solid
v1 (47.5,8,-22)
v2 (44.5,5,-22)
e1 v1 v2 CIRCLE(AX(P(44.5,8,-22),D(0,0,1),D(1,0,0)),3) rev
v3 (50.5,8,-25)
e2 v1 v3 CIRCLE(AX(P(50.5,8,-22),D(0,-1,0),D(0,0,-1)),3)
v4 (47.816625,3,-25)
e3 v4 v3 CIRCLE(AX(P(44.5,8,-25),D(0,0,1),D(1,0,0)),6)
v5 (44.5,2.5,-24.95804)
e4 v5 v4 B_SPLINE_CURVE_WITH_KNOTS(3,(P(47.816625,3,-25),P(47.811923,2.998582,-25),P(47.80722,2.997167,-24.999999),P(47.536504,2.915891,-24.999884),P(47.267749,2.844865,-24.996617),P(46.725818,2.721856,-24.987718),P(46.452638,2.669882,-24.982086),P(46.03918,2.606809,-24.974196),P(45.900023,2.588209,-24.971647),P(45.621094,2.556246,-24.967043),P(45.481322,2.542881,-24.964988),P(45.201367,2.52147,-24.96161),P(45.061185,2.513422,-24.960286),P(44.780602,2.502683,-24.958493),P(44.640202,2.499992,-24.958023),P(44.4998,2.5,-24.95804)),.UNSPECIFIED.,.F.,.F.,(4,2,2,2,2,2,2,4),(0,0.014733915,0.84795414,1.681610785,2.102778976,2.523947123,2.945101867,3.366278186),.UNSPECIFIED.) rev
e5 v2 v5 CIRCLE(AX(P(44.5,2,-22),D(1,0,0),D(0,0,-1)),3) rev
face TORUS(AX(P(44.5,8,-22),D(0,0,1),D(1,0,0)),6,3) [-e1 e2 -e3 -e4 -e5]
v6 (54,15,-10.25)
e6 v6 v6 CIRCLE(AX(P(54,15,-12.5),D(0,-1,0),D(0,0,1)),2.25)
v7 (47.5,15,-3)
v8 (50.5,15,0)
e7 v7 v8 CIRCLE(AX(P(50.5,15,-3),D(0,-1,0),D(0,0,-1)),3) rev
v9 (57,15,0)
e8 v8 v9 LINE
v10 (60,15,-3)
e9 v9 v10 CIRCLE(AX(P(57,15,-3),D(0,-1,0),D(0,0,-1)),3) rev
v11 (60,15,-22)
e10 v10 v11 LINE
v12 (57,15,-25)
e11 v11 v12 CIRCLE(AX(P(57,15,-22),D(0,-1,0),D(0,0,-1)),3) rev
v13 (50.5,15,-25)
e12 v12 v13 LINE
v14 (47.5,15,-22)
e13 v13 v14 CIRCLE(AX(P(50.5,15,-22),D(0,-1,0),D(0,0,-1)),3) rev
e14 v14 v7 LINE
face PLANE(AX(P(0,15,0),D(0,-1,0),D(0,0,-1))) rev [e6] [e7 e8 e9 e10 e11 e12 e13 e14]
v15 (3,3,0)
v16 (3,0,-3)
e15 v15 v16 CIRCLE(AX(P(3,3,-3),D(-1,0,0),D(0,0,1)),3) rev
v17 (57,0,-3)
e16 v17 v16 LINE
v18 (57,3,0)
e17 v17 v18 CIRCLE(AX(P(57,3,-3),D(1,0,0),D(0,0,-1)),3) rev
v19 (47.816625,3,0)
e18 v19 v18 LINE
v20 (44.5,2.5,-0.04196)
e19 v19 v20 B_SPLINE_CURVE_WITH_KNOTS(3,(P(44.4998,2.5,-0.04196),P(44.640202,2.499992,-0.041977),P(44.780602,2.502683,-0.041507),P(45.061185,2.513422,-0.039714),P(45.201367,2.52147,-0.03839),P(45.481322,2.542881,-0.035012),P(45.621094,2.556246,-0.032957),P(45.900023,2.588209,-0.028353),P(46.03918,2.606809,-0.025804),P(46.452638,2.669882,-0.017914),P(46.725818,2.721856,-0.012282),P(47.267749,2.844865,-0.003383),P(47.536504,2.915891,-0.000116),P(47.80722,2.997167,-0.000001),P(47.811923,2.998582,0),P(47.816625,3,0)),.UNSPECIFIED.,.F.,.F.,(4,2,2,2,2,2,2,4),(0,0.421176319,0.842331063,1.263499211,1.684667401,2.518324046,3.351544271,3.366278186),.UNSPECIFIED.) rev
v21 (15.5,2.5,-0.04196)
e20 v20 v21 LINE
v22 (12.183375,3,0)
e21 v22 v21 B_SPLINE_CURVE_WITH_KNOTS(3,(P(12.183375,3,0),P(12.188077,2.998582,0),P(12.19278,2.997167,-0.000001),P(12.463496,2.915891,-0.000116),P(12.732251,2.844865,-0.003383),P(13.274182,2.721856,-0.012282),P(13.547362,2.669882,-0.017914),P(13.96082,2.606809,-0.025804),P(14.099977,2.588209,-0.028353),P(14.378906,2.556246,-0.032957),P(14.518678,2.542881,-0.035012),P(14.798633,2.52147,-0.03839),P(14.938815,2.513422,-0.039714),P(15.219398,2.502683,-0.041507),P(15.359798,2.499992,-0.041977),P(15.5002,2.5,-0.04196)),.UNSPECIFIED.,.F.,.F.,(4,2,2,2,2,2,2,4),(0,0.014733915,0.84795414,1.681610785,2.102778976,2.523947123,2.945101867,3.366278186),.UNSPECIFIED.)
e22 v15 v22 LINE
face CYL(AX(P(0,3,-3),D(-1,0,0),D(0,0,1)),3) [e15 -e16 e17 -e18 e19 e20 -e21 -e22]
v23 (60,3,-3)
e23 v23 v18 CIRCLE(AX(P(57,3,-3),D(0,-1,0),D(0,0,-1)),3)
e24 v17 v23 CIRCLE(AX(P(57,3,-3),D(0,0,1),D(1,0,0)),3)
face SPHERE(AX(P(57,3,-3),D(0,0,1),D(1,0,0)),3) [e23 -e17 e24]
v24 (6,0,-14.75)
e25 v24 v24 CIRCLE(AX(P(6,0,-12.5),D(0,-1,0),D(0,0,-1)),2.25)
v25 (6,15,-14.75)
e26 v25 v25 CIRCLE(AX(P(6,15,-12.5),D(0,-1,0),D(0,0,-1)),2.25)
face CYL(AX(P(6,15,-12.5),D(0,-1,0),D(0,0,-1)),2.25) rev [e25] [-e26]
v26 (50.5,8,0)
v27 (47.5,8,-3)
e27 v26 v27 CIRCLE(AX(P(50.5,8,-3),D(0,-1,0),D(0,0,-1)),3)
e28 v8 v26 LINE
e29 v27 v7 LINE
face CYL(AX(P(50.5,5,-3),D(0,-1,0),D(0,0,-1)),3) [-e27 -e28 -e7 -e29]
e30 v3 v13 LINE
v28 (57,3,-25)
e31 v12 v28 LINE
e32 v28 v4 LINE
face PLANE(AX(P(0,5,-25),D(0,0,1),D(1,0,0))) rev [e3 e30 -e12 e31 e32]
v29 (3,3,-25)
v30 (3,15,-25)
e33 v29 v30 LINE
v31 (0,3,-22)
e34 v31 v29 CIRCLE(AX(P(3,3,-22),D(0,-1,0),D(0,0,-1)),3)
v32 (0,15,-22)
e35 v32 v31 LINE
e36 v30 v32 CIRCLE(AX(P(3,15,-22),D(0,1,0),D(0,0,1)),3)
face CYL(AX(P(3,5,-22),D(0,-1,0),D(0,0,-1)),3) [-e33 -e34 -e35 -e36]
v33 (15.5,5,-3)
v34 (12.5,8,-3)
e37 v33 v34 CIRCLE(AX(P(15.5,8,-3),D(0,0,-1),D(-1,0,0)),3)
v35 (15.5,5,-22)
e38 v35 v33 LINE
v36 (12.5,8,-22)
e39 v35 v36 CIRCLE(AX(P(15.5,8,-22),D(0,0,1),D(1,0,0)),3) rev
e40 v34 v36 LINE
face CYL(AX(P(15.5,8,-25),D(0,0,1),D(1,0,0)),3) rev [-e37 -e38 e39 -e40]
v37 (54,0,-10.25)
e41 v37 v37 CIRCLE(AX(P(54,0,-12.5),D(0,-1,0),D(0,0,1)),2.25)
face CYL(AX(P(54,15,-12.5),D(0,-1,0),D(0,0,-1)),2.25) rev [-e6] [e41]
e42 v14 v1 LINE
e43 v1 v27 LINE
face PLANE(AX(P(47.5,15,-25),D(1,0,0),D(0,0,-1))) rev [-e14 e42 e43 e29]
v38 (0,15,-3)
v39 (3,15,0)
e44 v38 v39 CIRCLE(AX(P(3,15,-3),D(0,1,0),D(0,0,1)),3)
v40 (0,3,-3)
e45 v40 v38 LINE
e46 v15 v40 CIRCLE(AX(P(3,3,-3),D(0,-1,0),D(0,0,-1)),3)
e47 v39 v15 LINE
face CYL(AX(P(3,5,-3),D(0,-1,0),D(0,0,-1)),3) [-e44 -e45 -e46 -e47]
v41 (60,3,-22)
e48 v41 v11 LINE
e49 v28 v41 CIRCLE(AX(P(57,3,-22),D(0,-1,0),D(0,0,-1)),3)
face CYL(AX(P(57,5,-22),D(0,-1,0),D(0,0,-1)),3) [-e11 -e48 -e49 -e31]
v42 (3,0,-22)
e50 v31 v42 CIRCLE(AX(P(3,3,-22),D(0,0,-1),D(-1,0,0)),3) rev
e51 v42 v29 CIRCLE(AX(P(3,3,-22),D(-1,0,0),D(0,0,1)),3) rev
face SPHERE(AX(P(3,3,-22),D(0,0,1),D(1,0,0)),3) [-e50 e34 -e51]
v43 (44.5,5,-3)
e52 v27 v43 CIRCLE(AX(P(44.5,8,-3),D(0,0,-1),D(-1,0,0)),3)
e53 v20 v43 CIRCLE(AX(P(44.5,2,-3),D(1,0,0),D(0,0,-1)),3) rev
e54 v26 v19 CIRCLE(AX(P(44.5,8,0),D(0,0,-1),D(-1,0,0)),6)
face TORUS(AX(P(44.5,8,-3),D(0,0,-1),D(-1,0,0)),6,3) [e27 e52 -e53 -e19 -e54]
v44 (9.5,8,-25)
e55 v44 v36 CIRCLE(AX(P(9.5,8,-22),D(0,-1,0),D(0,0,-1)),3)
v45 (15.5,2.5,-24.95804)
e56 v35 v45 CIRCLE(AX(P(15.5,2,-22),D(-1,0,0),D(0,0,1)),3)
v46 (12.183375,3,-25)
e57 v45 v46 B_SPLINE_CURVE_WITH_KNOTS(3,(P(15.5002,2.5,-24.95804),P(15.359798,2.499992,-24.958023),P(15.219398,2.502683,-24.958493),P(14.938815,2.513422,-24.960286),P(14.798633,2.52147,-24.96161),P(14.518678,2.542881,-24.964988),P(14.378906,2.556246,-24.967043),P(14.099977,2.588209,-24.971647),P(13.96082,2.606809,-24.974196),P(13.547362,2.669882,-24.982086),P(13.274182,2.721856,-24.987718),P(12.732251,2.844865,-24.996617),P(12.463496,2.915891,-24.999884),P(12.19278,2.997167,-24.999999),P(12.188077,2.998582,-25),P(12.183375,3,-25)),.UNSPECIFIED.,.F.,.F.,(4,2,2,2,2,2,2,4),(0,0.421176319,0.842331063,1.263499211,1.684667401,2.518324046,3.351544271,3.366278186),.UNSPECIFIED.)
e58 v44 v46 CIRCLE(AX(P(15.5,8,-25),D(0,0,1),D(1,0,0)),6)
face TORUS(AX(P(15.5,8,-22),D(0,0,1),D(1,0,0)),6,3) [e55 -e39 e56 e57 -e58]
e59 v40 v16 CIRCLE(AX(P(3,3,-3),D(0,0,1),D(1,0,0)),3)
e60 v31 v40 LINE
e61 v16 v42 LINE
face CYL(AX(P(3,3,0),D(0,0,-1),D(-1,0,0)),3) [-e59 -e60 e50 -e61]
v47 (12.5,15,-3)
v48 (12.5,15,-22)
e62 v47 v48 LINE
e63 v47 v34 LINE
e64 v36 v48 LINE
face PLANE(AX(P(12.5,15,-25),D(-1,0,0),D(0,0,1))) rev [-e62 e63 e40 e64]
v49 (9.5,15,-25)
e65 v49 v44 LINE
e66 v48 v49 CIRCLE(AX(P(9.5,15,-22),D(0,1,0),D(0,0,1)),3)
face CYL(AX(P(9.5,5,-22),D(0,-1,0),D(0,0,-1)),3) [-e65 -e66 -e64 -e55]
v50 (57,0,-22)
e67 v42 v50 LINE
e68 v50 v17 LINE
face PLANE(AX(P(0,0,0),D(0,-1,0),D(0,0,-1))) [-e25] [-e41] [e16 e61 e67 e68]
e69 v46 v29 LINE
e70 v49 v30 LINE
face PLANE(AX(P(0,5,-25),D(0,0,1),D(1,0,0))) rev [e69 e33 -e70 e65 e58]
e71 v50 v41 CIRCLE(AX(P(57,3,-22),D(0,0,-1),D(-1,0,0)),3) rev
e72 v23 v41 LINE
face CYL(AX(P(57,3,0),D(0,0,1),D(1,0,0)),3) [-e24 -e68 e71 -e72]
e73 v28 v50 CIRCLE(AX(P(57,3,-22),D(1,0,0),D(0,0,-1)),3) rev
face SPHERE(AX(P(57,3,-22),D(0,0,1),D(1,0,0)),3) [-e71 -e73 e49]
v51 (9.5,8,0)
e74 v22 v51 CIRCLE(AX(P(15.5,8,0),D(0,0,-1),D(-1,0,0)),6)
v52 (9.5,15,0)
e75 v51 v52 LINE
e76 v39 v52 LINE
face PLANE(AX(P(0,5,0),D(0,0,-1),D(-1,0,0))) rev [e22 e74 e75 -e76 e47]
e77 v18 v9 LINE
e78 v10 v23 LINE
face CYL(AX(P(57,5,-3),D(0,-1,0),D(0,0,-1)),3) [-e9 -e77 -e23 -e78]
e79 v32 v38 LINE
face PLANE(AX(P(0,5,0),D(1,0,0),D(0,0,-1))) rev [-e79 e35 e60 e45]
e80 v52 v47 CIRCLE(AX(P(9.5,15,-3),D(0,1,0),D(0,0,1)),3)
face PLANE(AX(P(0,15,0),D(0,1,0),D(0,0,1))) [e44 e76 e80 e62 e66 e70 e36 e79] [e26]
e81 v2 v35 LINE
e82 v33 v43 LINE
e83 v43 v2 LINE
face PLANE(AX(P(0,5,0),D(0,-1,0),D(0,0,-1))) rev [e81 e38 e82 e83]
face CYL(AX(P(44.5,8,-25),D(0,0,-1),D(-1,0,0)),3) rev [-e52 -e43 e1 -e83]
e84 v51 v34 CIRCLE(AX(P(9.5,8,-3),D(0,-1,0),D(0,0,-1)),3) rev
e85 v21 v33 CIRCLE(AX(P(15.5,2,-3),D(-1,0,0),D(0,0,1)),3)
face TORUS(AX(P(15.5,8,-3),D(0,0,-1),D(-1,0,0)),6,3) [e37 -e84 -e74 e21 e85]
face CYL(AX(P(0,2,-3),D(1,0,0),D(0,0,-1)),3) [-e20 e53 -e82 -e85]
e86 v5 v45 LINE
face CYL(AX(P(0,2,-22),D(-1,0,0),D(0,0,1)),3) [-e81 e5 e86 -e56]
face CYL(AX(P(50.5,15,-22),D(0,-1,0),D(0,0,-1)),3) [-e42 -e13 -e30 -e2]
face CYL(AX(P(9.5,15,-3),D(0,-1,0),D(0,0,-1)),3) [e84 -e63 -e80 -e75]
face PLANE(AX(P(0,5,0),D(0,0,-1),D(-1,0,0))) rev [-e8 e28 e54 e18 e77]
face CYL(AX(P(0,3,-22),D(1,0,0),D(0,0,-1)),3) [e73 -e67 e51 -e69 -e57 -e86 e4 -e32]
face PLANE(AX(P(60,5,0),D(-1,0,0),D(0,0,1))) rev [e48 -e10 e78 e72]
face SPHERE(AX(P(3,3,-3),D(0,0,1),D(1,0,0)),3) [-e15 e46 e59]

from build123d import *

# Parameters (mm, degrees)
SKETCH1_W           = 60
SKETCH1_H           = 25
BOSS_EXTRUDE1_DEPTH = 5
SKETCH2_W           = 12.5
SKETCH2_H           = 25
BOSS_EXTRUDE2_DEPTH = 10
SKETCH3_R           = 2.25
CUT_EXTRUDE1_DEPTH  = 15
FILLET1_R           = 3


with BuildPart() as part:
    # Sketch1 → Boss-Extrude1 (new body)
    with BuildSketch(Plane(origin=(0, 0, 0), x_dir=(1, 0, 0), z_dir=(0, 1, 0))):
        with Locations((30, 12.5)):
            Rectangle(SKETCH1_W, SKETCH1_H)
    extrude(amount=BOSS_EXTRUDE1_DEPTH)

    # Sketch2 → Boss-Extrude2 (add)
    with BuildSketch(Plane(origin=(0, 5, 0), x_dir=(1, 0, 0), z_dir=(0, 1, 0))):
        with Locations((6.25, 12.5)):
            Rectangle(SKETCH2_W, SKETCH2_H)
        with Locations((53.75, 12.5)):
            Rectangle(SKETCH2_W, SKETCH2_H)
    extrude(amount=BOSS_EXTRUDE2_DEPTH)

    # Sketch3 → Cut-Extrude1 (cut)
    with BuildSketch(Plane.XZ):
        with Locations(Location((6, -12.5, 0), (0, 0, 270))):
            Circle(SKETCH3_R)
        with Locations(Location((54, -12.5, 0), (0, 0, 90))):
            Circle(SKETCH3_R)
    extrude(amount=-CUT_EXTRUDE1_DEPTH, mode=Mode.SUBTRACT)

    # Fillet1
    # the kernel refuses this fillet: 3 mm, written as the material it adds along each edge
    with BuildSketch(Plane(origin=(12.5, 5, -25), x_dir=(0, 1, 0), z_dir=(0, 0, 1)), Plane(origin=(47.5, 5, -25), x_dir=(-1, 0, 0), z_dir=(0, 0, 1))) as fillet1_piece_1:
        with BuildLine():
            CenterArc((FILLET1_R, -FILLET1_R), FILLET1_R, 90, 90)
            Line((0, -FILLET1_R), (0, 0))
            Line((0, 0), (FILLET1_R, 0))
        make_face()
    extrude(amount=25)
    # the kernel refuses this fillet: 3 mm, written as the material it takes off along each edge
    with BuildSketch(Plane(origin=(57, 3, -22), x_dir=(0, 0, -1), z_dir=(0, -1, 0))) as fillet1_2_piece_1_section:
        Polygon((0, 0), (FILLET1_R * 1.02, 0), (FILLET1_R * 1.02, FILLET1_R * 1.02), (0, FILLET1_R * 1.02), align=None)
    fillet1_2_piece_1 = extrude(amount=FILLET1_R * 1.02, mode=Mode.PRIVATE)
    fillet1_2_piece_1 = fillet1_2_piece_1 - Plane(origin=(57, 3, -22), x_dir=(-0.7071067811865475, 0, 0.7071067811865475), z_dir=(0, -1, 0)) * Sphere(FILLET1_R, mode=Mode.PRIVATE)
    add(fillet1_2_piece_1, mode=Mode.SUBTRACT)
    with BuildSketch(Plane(origin=(3, 3, -22), x_dir=(0, 0, -1), z_dir=(0, -1, 0))) as fillet1_2_piece_2_section:
        Polygon((0, 0), (FILLET1_R * 1.02, 0), (FILLET1_R * 1.02, -FILLET1_R * 1.02), (0, -FILLET1_R * 1.02), align=None)
    fillet1_2_piece_2 = extrude(amount=FILLET1_R * 1.02, mode=Mode.PRIVATE)
    fillet1_2_piece_2 = fillet1_2_piece_2 - Plane(origin=(3, 3, -22), x_dir=(0.7071067811865475, 0, 0.7071067811865475), z_dir=(0, -1, 0)) * Sphere(FILLET1_R, mode=Mode.PRIVATE)
    add(fillet1_2_piece_2, mode=Mode.SUBTRACT)
    with BuildSketch(Plane(origin=(57, 3, -3), x_dir=(0, 0, 1), z_dir=(0, -1, 0))) as fillet1_2_piece_3_section:
        Polygon((0, 0), (FILLET1_R * 1.02, 0), (FILLET1_R * 1.02, -FILLET1_R * 1.02), (0, -FILLET1_R * 1.02), align=None)
    fillet1_2_piece_3 = extrude(amount=FILLET1_R * 1.02, mode=Mode.PRIVATE)
    fillet1_2_piece_3 = fillet1_2_piece_3 - Plane(origin=(57, 3, -3), x_dir=(-0.7071067811865475, 0, -0.7071067811865475), z_dir=(0, -1, 0)) * Sphere(FILLET1_R, mode=Mode.PRIVATE)
    add(fillet1_2_piece_3, mode=Mode.SUBTRACT)
    with BuildSketch(Plane(origin=(3, 3, -3), x_dir=(0, -1, 0), z_dir=(0, 0, 1))) as fillet1_2_piece_4_section:
        Polygon((0, 0), (FILLET1_R * 1.02, 0), (FILLET1_R * 1.02, -FILLET1_R * 1.02), (0, -FILLET1_R * 1.02), align=None)
    fillet1_2_piece_4 = extrude(amount=FILLET1_R * 1.02, mode=Mode.PRIVATE)
    fillet1_2_piece_4 = fillet1_2_piece_4 - Plane(origin=(3, 3, -3), x_dir=(0.7071067811865475, 0.7071067811865475, 0), z_dir=(0, 0, 1)) * Sphere(FILLET1_R, mode=Mode.PRIVATE)
    add(fillet1_2_piece_4, mode=Mode.SUBTRACT)
    with BuildSketch(Plane(origin=(57, 0, -25), x_dir=(0, 0, 1), z_dir=(-1, 0, 0))) as fillet1_2_piece_5:
        with BuildLine():
            CenterArc((FILLET1_R, FILLET1_R), FILLET1_R, 180, 90)
            Line((0, FILLET1_R), (0, 0))
            Line((0, 0), (FILLET1_R, 0))
        make_face()
    extrude(amount=54, mode=Mode.SUBTRACT)
    with BuildSketch(Plane(origin=(60, 0, -3), x_dir=(0, 1, 0), z_dir=(0, 0, -1)), Plane(origin=(0, 0, -22), x_dir=(0, 1, 0), z_dir=(0, 0, 1))) as fillet1_2_piece_6:
        with BuildLine():
            CenterArc((FILLET1_R, -FILLET1_R), FILLET1_R, 90, 90)
            Line((0, -FILLET1_R), (0, 0))
            Line((0, 0), (FILLET1_R, 0))
        make_face()
    extrude(amount=19, mode=Mode.SUBTRACT)
    with BuildSketch(Plane(origin=(3, 0, 0), x_dir=(0, 1, 0), z_dir=(1, 0, 0))) as fillet1_2_piece_7:
        with BuildLine():
            CenterArc((FILLET1_R, -FILLET1_R), FILLET1_R, 90, 90)
            Line((0, -FILLET1_R), (0, 0))
            Line((0, 0), (FILLET1_R, 0))
        make_face()
    extrude(amount=54, mode=Mode.SUBTRACT)
    with BuildSketch(Plane(origin=(0, 22.5, -25), x_dir=(0, 0, 1), z_dir=(0, -1, 0)), Plane(origin=(60, 3, -25), x_dir=(0, 0, 1), z_dir=(0, 1, 0)), Plane(origin=(60, 3, 0), x_dir=(-1, 0, 0), z_dir=(0, 1, 0)), Plane(origin=(0, 22.5, 0), x_dir=(1, 0, 0), z_dir=(0, -1, 0))) as fillet1_2_piece_8:
        with BuildLine():
            CenterArc((FILLET1_R, -FILLET1_R), FILLET1_R, 90, 90)
            Line((0, -FILLET1_R), (0, 0))
            Line((0, 0), (FILLET1_R, 0))
        make_face()
    extrude(amount=19.5, mode=Mode.SUBTRACT)
    # the kernel refuses this fillet: 3 mm, written as the material it takes off along each edge
    with BuildSketch(Plane(origin=(15.5, 5, 0), x_dir=(0, -1, 0), z_dir=(1, 0, 0))) as fillet1_3_piece_1:
        with BuildLine():
            CenterArc((FILLET1_R, FILLET1_R), FILLET1_R, 180, 90)
            Line((0, FILLET1_R), (0, 0))
            Line((0, 0), (FILLET1_R, 0))
        make_face()
    extrude(amount=29, mode=Mode.SUBTRACT)
    with BuildSketch(Plane(origin=(12.5, 8, 0), x_dir=(-1, 0, 0), z_dir=(0, 1, 0)), Plane(origin=(12.5, 8, -25), x_dir=(0, 0, 1), z_dir=(0, 1, 0))) as fillet1_3_piece_2:
        with BuildLine():
            CenterArc((FILLET1_R, -FILLET1_R), FILLET1_R, 90, 90)
            Line((0, -FILLET1_R), (0, 0))
            Line((0, 0), (FILLET1_R, 0))
        make_face()
    extrude(amount=14.5, mode=Mode.SUBTRACT)
    with BuildSketch(Plane(origin=(44.5, 5, -25), x_dir=(0, 0, 1), z_dir=(-1, 0, 0))) as fillet1_3_piece_3:
        with BuildLine():
            CenterArc((FILLET1_R, -FILLET1_R), FILLET1_R, 90, 90)
            Line((0, -FILLET1_R), (0, 0))
            Line((0, 0), (FILLET1_R, 0))
        make_face()
    extrude(amount=29, mode=Mode.SUBTRACT)
    with BuildSketch(Plane(origin=(47.5, 8, -25), x_dir=(0, 0, 1), z_dir=(0, 1, 0)), Plane(origin=(47.5, 8, 0), x_dir=(1, 0, 0), z_dir=(0, 1, 0))) as fillet1_3_piece_4:
        with BuildLine():
            CenterArc((FILLET1_R, FILLET1_R), FILLET1_R, 180, 90)
            Line((0, FILLET1_R), (0, 0))
            Line((0, 0), (FILLET1_R, 0))
        make_face()
    extrude(amount=14.5, mode=Mode.SUBTRACT)
    with BuildSketch(Plane(origin=(44.5, 8, 0), x_dir=(0, -1, 0), z_dir=(-1, 0, 0))) as fillet1_3_piece_5:
        with BuildLine():
            CenterArc((3 + FILLET1_R, -FILLET1_R), FILLET1_R, 90, 90)
            Line((3, -FILLET1_R), (3, 0))
            Line((3, 0), (3 + FILLET1_R, 0))
        make_face()
    revolve(axis=Axis((44.5, 8, 0), (0, 0, 1)), revolution_arc=90, mode=Mode.SUBTRACT)
    with BuildSketch(Plane(origin=(44.5, 8, -25), x_dir=(0, -1, 0), z_dir=(-1, 0, 0))) as fillet1_3_piece_6:
        with BuildLine():
            CenterArc((3 + FILLET1_R, FILLET1_R), FILLET1_R, 180, 90)
            Line((3 + FILLET1_R, 0), (3, 0))
            Line((3, 0), (3, FILLET1_R))
        make_face()
    revolve(axis=Axis((44.5, 8, -25), (0, 0, 1)), revolution_arc=90, mode=Mode.SUBTRACT)
    with BuildSketch(Plane(origin=(15.5, 8, -25), x_dir=(-1, 0, 0), z_dir=(0, 1, 0))) as fillet1_3_piece_7:
        with BuildLine():
            CenterArc((3 + FILLET1_R, FILLET1_R), FILLET1_R, 180, 90)
            Line((3 + FILLET1_R, 0), (3, 0))
            Line((3, 0), (3, FILLET1_R))
        make_face()
    revolve(axis=Axis((15.5, 8, -25), (0, 0, 1)), revolution_arc=90, mode=Mode.SUBTRACT)
    with BuildSketch(Plane(origin=(15.5, 8, 0), x_dir=(-1, 0, 0), z_dir=(0, 1, 0))) as fillet1_3_piece_8:
        with BuildLine():
            CenterArc((3 + FILLET1_R, -FILLET1_R), FILLET1_R, 90, 90)
            Line((3, -FILLET1_R), (3, 0))
            Line((3, 0), (3 + FILLET1_R, 0))
        make_face()
    revolve(axis=Axis((15.5, 8, 0), (0, 0, 1)), revolution_arc=90, mode=Mode.SUBTRACT)


solid = part.part
